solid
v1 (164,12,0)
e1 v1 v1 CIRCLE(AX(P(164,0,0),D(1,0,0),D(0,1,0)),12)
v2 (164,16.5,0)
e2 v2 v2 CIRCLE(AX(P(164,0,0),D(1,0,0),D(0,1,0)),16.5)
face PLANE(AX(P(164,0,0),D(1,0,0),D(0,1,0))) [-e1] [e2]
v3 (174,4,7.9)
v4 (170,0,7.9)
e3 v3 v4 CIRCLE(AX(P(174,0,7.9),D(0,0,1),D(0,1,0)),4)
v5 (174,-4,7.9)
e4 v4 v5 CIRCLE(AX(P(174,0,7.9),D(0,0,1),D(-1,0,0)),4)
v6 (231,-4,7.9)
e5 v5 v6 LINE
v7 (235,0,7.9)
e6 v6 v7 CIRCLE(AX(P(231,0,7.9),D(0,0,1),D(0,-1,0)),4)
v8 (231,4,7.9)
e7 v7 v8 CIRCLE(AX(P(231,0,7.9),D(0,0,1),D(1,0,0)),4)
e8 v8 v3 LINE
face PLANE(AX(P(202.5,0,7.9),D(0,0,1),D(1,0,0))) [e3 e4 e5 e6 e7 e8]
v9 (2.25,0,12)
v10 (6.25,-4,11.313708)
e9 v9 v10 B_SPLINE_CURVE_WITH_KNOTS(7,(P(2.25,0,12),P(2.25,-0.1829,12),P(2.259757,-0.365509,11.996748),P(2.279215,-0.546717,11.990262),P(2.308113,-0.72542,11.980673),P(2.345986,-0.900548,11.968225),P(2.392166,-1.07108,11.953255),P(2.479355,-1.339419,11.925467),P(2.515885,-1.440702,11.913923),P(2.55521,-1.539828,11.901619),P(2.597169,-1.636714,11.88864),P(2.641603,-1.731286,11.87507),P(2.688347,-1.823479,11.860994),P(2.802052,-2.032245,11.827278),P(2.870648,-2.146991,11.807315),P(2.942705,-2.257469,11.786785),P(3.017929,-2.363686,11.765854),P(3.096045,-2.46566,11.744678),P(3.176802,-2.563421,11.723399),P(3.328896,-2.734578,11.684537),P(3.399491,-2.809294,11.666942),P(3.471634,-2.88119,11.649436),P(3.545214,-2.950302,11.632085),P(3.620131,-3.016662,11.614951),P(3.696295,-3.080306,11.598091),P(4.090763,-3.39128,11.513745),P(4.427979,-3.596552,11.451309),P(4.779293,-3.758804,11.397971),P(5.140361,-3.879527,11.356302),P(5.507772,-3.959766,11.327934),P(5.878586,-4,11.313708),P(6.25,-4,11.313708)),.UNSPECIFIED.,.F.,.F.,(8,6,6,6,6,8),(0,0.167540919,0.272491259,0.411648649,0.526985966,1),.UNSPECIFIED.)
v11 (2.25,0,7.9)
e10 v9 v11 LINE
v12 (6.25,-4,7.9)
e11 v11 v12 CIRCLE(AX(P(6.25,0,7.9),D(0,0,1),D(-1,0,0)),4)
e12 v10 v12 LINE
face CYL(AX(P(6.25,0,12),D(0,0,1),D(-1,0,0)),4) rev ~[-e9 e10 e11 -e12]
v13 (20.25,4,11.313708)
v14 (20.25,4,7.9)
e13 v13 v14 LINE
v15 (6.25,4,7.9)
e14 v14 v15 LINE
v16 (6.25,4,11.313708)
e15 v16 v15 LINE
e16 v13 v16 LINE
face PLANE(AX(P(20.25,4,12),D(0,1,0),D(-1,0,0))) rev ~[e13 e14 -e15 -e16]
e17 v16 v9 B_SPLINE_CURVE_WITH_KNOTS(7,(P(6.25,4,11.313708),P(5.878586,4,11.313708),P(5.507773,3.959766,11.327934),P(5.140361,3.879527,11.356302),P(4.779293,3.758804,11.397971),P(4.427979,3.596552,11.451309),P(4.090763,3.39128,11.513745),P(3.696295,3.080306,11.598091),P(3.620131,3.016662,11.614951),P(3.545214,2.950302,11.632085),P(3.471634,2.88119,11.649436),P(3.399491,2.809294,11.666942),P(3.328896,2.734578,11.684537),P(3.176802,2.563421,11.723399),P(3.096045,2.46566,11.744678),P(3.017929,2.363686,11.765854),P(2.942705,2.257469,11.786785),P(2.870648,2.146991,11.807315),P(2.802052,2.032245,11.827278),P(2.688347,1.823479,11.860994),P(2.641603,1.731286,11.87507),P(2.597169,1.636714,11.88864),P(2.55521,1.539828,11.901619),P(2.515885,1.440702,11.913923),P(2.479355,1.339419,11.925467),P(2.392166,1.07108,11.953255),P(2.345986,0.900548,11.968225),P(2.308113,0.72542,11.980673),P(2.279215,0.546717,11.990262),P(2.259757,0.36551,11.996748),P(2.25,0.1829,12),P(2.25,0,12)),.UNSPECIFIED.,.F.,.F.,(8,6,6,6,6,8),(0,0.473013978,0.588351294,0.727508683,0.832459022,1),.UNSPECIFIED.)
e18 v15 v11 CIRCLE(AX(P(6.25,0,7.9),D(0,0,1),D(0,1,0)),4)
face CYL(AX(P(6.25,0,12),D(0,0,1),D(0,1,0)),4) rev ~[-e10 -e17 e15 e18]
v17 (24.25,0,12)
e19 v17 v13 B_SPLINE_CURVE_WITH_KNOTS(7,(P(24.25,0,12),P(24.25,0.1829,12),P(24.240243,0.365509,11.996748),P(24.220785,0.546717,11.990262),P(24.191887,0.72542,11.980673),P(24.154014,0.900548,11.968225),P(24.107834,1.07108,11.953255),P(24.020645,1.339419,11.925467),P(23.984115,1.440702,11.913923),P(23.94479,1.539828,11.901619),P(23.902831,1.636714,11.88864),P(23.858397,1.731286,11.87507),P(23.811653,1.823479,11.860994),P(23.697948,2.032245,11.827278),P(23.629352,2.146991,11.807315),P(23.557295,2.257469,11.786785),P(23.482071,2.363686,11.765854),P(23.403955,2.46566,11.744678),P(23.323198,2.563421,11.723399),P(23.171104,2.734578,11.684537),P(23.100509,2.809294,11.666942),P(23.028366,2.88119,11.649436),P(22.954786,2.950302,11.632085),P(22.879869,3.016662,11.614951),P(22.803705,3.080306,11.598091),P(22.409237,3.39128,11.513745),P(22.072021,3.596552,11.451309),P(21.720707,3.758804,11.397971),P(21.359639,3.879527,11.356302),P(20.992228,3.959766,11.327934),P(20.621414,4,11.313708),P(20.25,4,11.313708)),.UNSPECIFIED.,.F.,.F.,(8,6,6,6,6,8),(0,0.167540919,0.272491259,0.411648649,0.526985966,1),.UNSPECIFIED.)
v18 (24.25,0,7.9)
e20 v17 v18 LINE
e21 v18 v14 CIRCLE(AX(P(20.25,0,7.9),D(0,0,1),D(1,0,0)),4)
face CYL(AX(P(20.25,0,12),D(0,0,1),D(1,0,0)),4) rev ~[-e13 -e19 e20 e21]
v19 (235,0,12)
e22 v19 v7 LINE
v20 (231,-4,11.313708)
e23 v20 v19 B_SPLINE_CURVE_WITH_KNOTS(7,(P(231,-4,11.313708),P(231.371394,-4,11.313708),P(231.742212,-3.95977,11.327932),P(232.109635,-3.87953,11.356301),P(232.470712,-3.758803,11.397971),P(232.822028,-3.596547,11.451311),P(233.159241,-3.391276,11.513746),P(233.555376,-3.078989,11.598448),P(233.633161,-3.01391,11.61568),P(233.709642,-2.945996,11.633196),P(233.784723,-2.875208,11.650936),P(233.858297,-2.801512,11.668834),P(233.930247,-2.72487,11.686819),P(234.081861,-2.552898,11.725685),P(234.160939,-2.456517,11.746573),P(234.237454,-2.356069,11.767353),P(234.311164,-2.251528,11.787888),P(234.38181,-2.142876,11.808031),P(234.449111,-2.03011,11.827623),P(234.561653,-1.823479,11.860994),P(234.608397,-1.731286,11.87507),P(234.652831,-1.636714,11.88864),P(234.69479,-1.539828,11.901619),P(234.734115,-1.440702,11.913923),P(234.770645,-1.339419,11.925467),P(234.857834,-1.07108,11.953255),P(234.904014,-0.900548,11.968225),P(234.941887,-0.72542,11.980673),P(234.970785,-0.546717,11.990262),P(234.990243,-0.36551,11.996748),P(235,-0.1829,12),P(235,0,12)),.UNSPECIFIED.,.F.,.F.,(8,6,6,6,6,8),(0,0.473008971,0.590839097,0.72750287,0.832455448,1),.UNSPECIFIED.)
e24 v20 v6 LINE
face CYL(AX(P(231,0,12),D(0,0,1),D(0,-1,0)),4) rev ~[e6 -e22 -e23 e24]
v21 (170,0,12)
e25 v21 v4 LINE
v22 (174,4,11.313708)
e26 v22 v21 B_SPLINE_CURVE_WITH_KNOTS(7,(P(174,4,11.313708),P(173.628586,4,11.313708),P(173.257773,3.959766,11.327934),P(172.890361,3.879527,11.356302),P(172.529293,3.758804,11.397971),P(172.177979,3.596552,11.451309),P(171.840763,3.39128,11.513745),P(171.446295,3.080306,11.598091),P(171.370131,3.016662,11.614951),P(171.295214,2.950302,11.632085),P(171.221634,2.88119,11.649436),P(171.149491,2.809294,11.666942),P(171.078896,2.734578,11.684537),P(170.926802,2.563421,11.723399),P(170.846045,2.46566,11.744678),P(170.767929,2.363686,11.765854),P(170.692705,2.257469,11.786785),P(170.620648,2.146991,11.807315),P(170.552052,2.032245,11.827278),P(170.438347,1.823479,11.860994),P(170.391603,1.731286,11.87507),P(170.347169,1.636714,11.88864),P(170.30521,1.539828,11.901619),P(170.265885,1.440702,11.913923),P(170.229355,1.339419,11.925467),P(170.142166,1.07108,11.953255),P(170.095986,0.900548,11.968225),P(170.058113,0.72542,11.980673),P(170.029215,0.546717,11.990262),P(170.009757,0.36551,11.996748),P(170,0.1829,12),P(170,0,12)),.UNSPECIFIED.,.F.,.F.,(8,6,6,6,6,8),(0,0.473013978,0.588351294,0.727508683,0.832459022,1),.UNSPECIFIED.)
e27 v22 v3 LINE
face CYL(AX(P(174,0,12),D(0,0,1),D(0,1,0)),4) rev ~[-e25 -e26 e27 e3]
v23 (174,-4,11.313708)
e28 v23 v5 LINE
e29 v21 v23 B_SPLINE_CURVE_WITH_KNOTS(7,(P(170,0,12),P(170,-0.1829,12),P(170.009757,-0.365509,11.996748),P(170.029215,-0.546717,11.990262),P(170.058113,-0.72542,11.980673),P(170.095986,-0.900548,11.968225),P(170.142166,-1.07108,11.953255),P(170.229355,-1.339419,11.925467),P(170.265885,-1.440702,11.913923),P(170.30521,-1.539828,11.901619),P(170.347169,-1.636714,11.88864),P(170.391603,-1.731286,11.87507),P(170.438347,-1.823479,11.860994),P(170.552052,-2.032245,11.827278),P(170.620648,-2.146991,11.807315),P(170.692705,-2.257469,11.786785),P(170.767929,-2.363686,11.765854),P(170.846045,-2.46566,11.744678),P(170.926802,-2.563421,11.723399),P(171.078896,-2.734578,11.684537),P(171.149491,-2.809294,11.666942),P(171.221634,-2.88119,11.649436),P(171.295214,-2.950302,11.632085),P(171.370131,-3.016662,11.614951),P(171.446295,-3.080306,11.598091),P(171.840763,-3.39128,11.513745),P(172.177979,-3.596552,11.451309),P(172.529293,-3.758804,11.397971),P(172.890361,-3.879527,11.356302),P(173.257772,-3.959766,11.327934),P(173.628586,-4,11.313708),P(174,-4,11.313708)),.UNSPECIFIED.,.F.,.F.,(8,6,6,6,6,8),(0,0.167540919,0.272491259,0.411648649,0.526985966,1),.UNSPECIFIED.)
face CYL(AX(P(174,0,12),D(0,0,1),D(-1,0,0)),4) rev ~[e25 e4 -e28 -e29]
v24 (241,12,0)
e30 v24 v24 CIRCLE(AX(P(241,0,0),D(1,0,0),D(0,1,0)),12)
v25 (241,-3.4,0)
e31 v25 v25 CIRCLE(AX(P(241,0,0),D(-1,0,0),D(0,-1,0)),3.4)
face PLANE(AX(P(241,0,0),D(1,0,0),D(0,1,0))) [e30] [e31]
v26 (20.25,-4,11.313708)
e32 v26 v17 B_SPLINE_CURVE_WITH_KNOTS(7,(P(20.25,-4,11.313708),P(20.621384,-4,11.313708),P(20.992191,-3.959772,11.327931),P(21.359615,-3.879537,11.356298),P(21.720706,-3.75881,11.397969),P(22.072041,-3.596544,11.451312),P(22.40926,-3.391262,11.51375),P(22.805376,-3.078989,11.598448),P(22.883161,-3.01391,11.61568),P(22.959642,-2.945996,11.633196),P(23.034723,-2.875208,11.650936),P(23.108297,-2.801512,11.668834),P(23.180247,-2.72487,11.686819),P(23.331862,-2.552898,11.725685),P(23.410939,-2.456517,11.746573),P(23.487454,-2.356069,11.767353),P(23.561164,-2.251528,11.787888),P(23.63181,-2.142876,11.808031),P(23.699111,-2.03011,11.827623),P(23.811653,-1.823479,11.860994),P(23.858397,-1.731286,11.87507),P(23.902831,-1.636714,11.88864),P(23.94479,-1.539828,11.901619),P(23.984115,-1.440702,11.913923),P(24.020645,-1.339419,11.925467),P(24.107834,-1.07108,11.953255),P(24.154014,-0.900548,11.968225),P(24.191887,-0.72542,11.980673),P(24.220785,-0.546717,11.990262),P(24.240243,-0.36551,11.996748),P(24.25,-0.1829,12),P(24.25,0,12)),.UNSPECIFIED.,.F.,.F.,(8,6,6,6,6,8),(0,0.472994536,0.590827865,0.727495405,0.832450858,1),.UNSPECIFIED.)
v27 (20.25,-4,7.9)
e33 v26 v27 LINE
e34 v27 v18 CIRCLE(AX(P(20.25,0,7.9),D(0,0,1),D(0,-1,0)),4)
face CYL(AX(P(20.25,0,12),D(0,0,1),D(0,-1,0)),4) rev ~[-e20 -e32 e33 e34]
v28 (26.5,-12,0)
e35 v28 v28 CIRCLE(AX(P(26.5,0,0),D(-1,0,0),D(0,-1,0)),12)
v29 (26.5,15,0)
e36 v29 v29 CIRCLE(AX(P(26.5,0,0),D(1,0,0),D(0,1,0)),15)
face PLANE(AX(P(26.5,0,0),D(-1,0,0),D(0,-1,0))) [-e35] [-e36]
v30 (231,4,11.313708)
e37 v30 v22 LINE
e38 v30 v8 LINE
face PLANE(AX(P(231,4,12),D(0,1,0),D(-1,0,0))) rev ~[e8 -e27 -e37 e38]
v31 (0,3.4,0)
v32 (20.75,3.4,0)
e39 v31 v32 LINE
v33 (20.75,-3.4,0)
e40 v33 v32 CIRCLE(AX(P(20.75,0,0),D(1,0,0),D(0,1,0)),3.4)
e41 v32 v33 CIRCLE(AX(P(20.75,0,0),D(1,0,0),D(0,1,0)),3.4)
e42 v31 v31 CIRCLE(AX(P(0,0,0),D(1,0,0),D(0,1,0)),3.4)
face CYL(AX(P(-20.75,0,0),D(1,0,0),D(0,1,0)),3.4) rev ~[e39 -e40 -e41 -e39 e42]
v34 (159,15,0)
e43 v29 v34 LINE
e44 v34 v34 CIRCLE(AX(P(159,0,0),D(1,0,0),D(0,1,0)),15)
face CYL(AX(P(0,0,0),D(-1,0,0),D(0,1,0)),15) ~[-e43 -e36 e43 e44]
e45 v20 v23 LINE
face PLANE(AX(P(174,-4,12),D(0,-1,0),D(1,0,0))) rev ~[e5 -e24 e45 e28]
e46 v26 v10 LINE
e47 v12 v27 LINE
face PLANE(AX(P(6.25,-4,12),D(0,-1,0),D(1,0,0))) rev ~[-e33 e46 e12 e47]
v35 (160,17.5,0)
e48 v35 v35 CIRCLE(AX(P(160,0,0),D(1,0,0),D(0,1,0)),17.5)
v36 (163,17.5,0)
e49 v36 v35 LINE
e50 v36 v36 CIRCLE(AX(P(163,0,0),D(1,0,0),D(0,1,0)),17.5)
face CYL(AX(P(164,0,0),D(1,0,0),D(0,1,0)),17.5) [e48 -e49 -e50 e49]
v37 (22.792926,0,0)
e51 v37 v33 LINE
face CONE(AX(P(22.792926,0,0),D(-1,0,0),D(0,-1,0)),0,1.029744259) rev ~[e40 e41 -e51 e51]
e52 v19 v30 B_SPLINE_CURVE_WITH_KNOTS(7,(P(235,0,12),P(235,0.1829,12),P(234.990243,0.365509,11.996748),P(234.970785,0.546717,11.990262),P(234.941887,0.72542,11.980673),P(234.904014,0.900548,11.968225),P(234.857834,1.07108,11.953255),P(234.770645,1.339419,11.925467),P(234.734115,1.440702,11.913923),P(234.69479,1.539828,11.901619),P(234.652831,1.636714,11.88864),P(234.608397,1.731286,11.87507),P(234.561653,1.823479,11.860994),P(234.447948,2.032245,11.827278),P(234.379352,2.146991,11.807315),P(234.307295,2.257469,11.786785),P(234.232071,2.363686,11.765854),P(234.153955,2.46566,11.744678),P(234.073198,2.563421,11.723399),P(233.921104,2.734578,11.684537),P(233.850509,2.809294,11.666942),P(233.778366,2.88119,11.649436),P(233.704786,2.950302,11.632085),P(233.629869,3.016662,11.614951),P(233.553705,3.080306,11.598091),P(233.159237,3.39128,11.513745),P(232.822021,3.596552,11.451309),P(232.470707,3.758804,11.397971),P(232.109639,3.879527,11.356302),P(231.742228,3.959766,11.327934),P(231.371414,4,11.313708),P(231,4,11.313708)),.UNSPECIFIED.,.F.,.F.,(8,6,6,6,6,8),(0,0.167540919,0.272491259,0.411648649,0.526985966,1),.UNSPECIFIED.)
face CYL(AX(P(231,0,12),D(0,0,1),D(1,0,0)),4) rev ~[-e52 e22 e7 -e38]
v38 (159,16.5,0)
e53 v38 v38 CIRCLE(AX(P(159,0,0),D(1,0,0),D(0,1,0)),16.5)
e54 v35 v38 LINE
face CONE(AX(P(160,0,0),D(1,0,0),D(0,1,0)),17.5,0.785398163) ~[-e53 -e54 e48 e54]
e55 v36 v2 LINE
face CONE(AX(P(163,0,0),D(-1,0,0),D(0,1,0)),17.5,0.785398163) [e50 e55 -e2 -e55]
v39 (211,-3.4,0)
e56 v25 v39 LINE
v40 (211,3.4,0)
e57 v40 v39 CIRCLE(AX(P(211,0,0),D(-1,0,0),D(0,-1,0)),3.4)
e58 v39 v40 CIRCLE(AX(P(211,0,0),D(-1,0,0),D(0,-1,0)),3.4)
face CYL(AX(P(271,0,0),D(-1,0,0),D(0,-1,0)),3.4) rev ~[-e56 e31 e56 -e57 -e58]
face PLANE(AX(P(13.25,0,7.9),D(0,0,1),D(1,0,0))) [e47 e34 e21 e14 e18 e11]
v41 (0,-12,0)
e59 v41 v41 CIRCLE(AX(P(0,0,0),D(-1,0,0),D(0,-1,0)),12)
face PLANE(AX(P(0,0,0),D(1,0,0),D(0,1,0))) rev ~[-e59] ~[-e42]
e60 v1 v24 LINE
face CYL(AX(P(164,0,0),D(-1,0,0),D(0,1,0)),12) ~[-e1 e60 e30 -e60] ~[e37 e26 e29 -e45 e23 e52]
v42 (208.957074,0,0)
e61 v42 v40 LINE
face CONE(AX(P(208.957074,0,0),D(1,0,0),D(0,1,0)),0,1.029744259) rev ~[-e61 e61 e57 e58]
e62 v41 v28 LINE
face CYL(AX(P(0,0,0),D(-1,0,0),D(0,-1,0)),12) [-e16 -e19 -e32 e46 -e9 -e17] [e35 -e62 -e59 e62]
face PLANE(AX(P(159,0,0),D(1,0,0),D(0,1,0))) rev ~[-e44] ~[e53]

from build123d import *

# Parameters (mm, degrees)
F0_R      = 15
F1_DEPTH  = 164
F2_R      = 12
F3_DEPTH  = 77
F5_D      = 6.8
F5_DEPTH  = 30
F5_TIP    = 2.0429261047
F8_DEPTH  = 4.1
F9_R      = 17.5
F9_R_2    = 15
F10_DEPTH = 5
F11_SIZE  = 1
F12_R     = 15
F12_R_2   = 12
F13_DEPTH = 26.5
F14_D     = 6.8
F14_DEPTH = 20.75
F14_TIP   = 2.0429261047
F16_DEPTH = 4.1


# Not quite as in the source:
# - a feature names something its author has since deleted; it is built from what else it names


with BuildPart() as f1:
    # F0 (on Right) → F1 (new body)
    with BuildSketch(Plane.YZ):
        Circle(F0_R)
    extrude(amount=F1_DEPTH)

    # F2 (on face) → F3 (join)
    with BuildSketch(Plane.YZ.offset(164)):
        Circle(F2_R)
    extrude(amount=F3_DEPTH)

    # F5
    with Locations(Plane.YZ.offset(241)):
        with Locations((0, 0)):
            Hole(F5_D / 2, depth=F5_DEPTH)
            with Locations((0, 0, -(F5_DEPTH + F5_TIP / 2))):  # 118° drill point
                Cone(0, F5_D / 2, F5_TIP, mode=Mode.SUBTRACT)

    # F7 (on offset) → F8 (cut)
    with BuildSketch(Plane.XY.offset(12)):
        with BuildLine():
            ThreePointArc((170, 0), (171.1715728753, -2.8284271247), (174, -4))
            Line((174, -4), (231, -4))
            ThreePointArc((231, -4), (233.8284271247, -2.8284271247), (235, 0))
            ThreePointArc((235, 0), (233.8284271247, 2.8284271247), (231, 4))
            Line((231, 4), (174, 4))
            ThreePointArc((174, 4), (171.1715728753, 2.8284271247), (170, 0))
        make_face()
    extrude(amount=-F8_DEPTH, mode=Mode.SUBTRACT)

    # F9 (on face) → F10 (join)
    with BuildSketch(Plane.YZ.offset(164)):
        Circle(F9_R)
        Circle(F9_R_2, mode=Mode.SUBTRACT)
    extrude(amount=-F10_DEPTH)

    # F11
    f11_edges = [f1.edges().sort_by_distance(p)[0] for p in [
        (164, -17.5, 0),
        (159, -17.5, 0),
    ]]
    chamfer(f11_edges, length=F11_SIZE)

    # F12 (on face) → F13 (cut)
    with BuildSketch(Plane(origin=(0, 0, 0), x_dir=(0, -1, 0), z_dir=(-1, 0, 0))):
        Circle(F12_R)
        Circle(F12_R_2, mode=Mode.SUBTRACT)
    extrude(amount=-F13_DEPTH, mode=Mode.SUBTRACT)

    # F14
    with Locations(Plane(origin=(0, 0, 0), x_dir=(0, -1, 0), z_dir=(-1, 0, 0))):
        with Locations((0, 0)):
            Hole(F14_D / 2, depth=F14_DEPTH)
            with Locations((0, 0, -(F14_DEPTH + F14_TIP / 2))):  # 118° drill point
                Cone(0, F14_D / 2, F14_TIP, mode=Mode.SUBTRACT)

    # F15 (on offset) → F16 (cut)
    with BuildSketch(Plane.XY.offset(12)):
        with BuildLine():
            Line((6.25, -4), (20.25, -4))
            ThreePointArc((20.25, -4), (23.0784271247, -2.8284271247), (24.25, 0))
            ThreePointArc((24.25, 0), (23.0784271247, 2.8284271247), (20.25, 4))
            Line((20.25, 4), (6.25, 4))
            ThreePointArc((6.25, 4), (3.4215728753, 2.8284271247), (2.25, 0))
            ThreePointArc((2.25, 0), (3.4215728753, -2.8284271247), (6.25, -4))
        make_face()
    extrude(amount=-F16_DEPTH, mode=Mode.SUBTRACT)


solid = f1.part
